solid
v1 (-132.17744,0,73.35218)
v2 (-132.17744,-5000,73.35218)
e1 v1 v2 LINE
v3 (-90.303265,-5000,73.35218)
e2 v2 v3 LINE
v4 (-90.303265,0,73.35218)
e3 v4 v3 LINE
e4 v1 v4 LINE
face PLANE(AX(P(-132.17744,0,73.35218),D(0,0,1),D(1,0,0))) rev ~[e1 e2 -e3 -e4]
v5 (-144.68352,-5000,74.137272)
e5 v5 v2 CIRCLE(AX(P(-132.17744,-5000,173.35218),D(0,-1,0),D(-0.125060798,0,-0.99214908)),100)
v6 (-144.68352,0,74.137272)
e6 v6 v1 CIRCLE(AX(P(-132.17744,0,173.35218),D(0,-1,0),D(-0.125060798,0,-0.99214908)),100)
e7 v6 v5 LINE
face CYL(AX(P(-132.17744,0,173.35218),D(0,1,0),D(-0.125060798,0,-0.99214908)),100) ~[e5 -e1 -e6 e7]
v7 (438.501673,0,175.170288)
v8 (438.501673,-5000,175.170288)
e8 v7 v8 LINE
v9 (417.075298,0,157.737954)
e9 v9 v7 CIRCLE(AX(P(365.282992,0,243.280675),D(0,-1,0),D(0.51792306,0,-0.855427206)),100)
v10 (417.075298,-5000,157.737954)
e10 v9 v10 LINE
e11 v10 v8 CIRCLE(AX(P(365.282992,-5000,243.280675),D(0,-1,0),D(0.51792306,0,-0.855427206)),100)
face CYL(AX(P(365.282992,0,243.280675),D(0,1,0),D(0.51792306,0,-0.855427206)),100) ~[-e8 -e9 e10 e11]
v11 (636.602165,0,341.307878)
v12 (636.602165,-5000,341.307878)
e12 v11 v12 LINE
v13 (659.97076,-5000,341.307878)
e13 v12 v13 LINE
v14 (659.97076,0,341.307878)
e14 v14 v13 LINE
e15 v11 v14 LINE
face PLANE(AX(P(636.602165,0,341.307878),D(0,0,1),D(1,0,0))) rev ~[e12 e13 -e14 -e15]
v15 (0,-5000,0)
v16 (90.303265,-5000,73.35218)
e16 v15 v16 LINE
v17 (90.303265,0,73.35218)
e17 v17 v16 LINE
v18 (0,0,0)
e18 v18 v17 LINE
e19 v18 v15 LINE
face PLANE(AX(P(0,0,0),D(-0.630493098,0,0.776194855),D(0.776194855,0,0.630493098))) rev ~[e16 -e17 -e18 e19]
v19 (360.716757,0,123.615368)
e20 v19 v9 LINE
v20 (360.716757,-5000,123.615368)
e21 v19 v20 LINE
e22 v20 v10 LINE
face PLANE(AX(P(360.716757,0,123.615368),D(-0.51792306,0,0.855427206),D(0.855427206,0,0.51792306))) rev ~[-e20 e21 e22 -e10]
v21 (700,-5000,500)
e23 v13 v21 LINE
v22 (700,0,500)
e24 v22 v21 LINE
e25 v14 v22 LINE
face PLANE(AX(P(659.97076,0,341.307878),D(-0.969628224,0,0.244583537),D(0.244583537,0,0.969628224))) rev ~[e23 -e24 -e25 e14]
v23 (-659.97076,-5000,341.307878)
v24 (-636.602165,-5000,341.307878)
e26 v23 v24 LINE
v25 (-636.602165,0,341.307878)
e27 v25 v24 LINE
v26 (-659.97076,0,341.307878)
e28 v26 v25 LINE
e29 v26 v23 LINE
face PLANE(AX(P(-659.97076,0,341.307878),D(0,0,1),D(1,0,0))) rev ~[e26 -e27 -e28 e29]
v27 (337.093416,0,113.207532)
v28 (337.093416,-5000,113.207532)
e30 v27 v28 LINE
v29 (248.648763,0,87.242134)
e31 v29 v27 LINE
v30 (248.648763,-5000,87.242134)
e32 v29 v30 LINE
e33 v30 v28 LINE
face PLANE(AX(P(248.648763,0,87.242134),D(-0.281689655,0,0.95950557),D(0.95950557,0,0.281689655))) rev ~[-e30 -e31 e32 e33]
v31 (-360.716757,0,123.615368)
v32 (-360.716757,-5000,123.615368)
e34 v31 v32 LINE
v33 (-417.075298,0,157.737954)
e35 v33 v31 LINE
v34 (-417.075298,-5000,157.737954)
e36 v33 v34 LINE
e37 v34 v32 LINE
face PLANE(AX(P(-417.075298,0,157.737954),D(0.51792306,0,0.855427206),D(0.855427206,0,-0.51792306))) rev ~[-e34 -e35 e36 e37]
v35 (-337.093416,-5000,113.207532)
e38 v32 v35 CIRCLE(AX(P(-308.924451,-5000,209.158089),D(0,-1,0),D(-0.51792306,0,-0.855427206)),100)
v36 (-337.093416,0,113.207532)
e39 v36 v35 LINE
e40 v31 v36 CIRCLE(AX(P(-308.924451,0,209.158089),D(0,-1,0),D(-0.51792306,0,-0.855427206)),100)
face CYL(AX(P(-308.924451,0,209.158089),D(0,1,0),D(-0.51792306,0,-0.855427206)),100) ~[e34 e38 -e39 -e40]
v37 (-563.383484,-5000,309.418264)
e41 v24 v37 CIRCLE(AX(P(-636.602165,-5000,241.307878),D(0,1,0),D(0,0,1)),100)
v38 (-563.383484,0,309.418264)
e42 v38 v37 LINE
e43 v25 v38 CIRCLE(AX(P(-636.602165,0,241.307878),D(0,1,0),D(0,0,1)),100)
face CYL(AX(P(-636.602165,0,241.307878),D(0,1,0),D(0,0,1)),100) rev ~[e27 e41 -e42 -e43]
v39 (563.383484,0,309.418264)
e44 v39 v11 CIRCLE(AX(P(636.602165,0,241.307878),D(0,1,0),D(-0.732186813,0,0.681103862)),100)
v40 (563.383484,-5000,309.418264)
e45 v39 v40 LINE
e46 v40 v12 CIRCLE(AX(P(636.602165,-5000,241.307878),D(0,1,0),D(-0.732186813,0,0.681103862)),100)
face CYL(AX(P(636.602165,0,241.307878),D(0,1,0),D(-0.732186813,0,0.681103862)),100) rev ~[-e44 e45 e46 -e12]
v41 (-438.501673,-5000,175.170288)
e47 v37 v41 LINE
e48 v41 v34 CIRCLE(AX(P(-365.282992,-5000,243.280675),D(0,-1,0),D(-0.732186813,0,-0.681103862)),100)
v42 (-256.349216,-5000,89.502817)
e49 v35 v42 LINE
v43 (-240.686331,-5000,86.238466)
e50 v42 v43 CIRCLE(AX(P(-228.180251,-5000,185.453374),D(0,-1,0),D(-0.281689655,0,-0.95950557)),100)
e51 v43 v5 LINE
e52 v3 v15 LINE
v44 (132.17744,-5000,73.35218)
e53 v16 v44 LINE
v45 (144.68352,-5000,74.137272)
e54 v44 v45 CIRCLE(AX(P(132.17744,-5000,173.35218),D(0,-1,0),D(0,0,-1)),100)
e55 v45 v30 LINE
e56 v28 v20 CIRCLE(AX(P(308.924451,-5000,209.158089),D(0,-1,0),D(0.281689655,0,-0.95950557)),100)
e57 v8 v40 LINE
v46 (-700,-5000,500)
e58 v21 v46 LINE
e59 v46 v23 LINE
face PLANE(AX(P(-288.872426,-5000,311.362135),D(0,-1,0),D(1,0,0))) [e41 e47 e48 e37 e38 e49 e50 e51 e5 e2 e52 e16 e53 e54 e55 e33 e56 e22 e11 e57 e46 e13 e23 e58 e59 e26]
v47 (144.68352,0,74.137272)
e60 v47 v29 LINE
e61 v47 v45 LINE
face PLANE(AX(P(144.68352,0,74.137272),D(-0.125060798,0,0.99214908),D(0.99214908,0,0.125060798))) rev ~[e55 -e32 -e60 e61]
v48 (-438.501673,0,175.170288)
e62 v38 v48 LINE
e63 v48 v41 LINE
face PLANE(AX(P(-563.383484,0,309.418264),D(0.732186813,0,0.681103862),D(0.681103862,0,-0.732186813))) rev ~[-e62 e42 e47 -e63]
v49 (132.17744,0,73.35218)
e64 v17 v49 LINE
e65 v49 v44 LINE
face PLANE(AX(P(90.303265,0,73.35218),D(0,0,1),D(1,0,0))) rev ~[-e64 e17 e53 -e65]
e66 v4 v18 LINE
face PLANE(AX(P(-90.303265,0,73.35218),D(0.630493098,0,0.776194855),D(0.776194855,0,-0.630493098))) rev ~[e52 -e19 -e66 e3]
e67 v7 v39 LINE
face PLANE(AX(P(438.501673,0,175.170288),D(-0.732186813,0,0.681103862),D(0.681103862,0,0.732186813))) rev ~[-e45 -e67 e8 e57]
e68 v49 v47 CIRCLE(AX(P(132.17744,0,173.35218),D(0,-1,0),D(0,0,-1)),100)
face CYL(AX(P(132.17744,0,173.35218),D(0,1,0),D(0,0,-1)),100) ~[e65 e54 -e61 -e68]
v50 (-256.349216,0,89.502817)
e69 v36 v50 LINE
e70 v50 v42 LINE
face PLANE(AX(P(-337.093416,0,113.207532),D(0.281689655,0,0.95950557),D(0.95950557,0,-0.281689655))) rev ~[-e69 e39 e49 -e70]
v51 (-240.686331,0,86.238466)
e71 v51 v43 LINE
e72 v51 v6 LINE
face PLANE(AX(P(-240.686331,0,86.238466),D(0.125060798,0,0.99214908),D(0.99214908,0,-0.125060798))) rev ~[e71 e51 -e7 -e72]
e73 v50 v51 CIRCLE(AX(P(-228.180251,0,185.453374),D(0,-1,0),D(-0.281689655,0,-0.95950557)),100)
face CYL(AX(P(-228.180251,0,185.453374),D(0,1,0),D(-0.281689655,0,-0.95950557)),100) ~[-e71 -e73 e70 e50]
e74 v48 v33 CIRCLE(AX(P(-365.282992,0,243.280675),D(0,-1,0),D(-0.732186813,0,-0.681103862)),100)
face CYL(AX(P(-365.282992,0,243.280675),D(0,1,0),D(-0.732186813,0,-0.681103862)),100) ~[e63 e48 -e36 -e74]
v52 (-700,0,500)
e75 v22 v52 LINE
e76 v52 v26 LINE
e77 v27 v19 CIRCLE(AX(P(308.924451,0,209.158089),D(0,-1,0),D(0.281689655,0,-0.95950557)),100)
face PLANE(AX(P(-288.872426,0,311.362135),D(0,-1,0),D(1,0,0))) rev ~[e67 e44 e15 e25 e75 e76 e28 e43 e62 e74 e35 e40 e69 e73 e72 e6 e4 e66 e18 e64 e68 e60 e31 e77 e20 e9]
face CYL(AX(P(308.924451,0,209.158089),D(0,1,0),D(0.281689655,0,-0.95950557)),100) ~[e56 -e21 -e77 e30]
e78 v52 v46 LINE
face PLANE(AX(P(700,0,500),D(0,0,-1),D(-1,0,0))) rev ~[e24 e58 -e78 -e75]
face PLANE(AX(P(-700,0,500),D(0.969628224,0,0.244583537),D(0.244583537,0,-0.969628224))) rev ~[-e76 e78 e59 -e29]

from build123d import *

# Parameters (mm, degrees)
F2_DEPTH = 5000


with BuildPart() as f2:
    # F0 (on Front) → F2 (new body)
    with BuildSketch(Plane.XZ):
        with BuildLine():
            Line((-90.3032645583, 73.3521804214), (0, 0))
            Line((0, 0), (0, 500))
            Line((0, 500), (-700, 500))
            Line((-700, 500), (-659.9707603455, 341.3078779773))
            Line((-659.9707603455, 341.3078779773), (-636.6021653731, 341.3078779773))
            ThreePointArc((-636.6021653731, 341.3078779773), (-596.6712163725, 332.9894972469), (-563.3834841061, 309.4182642155))
            Line((-563.3834841061, 309.4182642155), (-438.5016734996, 175.1702883654))
            ThreePointArc((-438.5016734996, 175.1702883654), (-428.3932790461, 165.710759699), (-417.0752981876, 157.7379540258))
            Line((-417.0752981876, 157.7379540258), (-360.7167568947, 123.615368327))
            ThreePointArc((-360.7167568947, 123.615368327), (-349.2423377723, 117.6459694815), (-337.0934164626, 113.2075319426))
            Line((-337.0934164626, 113.2075319426), (-256.349216299, 89.5028171123))
            ThreePointArc((-256.349216299, 89.5028171123), (-248.5831629557, 87.5568921429), (-240.6863306004, 86.2384660848))
            Line((-240.6863306004, 86.2384660848), (-144.6835198288, 74.1372724315))
            ThreePointArc((-144.6835198288, 74.1372724315), (-138.4427891974, 73.5486464183), (-132.1774400044, 73.3521804214))
            Line((-132.1774400044, 73.3521804214), (-90.3032645583, 73.3521804214))
        make_face()
        with BuildLine():
            Line((0, 500), (0, 0))
            Line((0, 0), (90.3032645583, 73.3521804214))
            Line((90.3032645583, 73.3521804214), (132.1774400044, 73.3521804214))
            ThreePointArc((132.1774400044, 73.3521804214), (138.4427891974, 73.5486464183), (144.6835198288, 74.1372724315))
            Line((144.6835198288, 74.1372724315), (248.6487627029, 87.2421339154))
            Line((248.6487627029, 87.2421339154), (337.0934164626, 113.2075319426))
            ThreePointArc((337.0934164626, 113.2075319426), (349.2423377723, 117.6459694815), (360.7167568947, 123.615368327))
            Line((360.7167568947, 123.615368327), (417.0752981876, 157.7379540258))
            ThreePointArc((417.0752981876, 157.7379540258), (428.3932790461, 165.710759699), (438.5016734996, 175.1702883654))
            Line((438.5016734996, 175.1702883654), (563.3834841061, 309.4182642155))
            ThreePointArc((563.3834841061, 309.4182642155), (596.6712163725, 332.9894972469), (636.6021653731, 341.3078779773))
            Line((636.6021653731, 341.3078779773), (659.9707603455, 341.3078779773))
            Line((659.9707603455, 341.3078779773), (700, 500))
            Line((700, 500), (0, 500))
        make_face()
    extrude(amount=F2_DEPTH)


solid = f2.part
